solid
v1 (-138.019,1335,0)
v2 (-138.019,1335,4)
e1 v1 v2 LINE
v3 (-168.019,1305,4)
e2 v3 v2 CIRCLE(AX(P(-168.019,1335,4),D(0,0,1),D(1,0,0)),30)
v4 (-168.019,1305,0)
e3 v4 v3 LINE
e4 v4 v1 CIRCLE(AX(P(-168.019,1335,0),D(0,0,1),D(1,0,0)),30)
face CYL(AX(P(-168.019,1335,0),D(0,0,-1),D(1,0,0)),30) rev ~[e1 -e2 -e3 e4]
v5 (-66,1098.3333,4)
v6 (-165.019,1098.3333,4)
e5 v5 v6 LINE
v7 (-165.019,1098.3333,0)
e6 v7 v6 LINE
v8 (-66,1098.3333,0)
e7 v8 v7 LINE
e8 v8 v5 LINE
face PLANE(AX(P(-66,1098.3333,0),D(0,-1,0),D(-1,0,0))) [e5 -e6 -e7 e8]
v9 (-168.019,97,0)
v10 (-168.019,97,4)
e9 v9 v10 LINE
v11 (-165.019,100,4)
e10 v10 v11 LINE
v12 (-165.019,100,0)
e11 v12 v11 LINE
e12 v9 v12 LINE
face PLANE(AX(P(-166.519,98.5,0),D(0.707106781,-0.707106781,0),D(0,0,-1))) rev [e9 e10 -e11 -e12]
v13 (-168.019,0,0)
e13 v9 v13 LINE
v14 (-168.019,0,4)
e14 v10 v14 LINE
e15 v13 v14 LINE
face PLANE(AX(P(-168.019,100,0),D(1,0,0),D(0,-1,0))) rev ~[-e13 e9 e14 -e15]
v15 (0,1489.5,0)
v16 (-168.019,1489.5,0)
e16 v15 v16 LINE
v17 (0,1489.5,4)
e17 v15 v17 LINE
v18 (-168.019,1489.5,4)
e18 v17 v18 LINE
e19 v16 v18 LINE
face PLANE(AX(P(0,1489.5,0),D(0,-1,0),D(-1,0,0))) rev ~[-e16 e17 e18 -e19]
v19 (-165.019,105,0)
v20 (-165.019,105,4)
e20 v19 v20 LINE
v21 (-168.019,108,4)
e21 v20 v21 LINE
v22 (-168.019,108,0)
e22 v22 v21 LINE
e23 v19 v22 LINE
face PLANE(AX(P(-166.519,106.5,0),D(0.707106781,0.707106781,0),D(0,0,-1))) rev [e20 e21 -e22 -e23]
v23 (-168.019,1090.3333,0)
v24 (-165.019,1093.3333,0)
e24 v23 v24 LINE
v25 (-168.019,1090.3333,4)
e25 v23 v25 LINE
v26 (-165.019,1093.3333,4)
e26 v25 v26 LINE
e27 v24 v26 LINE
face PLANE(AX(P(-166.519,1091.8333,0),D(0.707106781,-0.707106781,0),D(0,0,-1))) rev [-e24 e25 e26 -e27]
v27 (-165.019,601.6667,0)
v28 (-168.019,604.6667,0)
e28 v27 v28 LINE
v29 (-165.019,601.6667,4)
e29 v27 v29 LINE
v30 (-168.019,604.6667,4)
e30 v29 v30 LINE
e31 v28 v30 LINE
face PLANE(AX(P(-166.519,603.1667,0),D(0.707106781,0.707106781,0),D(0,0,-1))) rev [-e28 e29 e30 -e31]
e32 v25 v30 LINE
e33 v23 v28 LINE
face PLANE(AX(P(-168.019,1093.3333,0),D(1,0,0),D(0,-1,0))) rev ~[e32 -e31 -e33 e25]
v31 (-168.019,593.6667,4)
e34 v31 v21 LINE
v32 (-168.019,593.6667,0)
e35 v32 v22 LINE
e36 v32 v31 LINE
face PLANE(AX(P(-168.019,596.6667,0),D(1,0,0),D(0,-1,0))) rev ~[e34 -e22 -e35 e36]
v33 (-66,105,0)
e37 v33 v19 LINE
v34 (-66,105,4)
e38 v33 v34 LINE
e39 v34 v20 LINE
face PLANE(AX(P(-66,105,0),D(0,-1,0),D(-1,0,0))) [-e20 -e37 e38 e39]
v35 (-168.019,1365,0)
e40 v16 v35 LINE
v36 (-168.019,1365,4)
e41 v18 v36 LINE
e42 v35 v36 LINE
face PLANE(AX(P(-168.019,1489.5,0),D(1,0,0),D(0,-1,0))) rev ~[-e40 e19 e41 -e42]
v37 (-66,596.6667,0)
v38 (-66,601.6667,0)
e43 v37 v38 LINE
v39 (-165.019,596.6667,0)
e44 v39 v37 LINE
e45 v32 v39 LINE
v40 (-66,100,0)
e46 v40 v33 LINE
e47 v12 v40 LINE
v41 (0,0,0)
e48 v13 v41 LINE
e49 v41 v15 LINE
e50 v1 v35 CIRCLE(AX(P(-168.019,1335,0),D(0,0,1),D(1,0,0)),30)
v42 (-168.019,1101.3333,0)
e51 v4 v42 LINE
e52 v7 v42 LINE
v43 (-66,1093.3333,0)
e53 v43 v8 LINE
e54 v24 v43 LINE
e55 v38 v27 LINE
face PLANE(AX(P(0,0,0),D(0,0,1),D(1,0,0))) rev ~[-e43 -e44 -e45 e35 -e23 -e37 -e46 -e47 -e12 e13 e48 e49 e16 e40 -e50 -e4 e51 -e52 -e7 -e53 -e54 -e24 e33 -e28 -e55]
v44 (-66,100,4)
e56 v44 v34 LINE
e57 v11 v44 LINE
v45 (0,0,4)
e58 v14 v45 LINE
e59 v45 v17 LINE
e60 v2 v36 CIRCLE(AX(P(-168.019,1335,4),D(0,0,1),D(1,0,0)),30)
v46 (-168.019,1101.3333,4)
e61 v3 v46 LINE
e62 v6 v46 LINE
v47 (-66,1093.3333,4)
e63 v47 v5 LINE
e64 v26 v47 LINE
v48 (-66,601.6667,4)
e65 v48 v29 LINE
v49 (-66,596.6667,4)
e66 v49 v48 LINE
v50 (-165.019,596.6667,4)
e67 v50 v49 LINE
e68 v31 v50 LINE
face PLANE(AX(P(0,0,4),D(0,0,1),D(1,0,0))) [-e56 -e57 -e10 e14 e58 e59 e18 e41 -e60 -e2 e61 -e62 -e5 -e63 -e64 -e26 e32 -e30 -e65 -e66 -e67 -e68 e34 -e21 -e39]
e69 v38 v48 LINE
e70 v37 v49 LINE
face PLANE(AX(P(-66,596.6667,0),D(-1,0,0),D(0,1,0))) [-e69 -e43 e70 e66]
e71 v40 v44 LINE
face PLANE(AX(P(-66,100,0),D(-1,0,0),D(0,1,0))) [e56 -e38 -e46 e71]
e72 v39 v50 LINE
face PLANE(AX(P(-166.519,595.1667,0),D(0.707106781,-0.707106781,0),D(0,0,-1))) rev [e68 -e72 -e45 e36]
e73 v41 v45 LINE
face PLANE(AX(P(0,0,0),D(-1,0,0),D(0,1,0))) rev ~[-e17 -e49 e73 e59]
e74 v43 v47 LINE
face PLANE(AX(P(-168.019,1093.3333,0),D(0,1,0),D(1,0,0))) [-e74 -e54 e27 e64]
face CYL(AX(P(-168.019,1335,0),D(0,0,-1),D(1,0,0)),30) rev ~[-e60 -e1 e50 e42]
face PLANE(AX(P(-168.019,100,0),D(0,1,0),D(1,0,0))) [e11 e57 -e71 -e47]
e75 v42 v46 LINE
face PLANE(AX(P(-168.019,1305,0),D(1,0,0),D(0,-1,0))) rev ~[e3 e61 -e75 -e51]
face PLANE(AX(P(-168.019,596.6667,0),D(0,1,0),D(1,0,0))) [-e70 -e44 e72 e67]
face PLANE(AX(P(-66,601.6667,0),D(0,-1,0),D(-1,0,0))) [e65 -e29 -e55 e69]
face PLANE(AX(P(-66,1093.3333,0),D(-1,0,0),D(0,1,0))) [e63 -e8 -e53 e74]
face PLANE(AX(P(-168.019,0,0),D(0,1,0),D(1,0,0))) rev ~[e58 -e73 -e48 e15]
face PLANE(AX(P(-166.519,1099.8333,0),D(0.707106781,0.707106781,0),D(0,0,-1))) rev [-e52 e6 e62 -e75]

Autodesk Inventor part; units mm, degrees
ref_plane "YZ Plane" through (0, 0, 0) normal (1, 0, 0) x (0, 1, 0)
ref_plane "XZ Plane" through (0, 0, 0) normal (0, 1, 0) x (-1, 0, 0)
ref_plane "XY Plane" through (0, 0, 0) normal (0, 0, 1) x (1, 0, 0)
sketch "Sketch1" plane through (0, 0, 0) normal (0, 0, 1) x (1, 0, 0)
  line L0 (0, 1489.5) -> (-168.019, 1489.5)
  line L1 (-168.019, 1489.5) -> (-168.019, 0)
  line L2 (-168.019, 0) -> (0, 0)
  line L3 (0, 0) -> (0, 1489.5)
  line L4 (-168.019, 100) -> (-66, 100)
  line L5 (-66, 100) -> (-66, 105)
  line L6 (-66, 105) -> (-168.019, 105)
  line L7 (-168.019, 105) -> (-168.019, 100)
  line L8 (-168.019, 596.6667) -> (-66, 596.6667)
  line L9 (-66, 596.6667) -> (-66, 601.6667)
  line L10 (-66, 601.6667) -> (-168.019, 601.6667)
  line L11 (-168.019, 601.6667) -> (-168.019, 596.6667)
  line L12 (-168.019, 1093.3333) -> (-66, 1093.3333)
  line L13 (-66, 1093.3333) -> (-66, 1098.3333)
  line L14 (-66, 1098.3333) -> (-168.019, 1098.3333)
  line L15 (-168.019, 1098.3333) -> (-168.019, 1093.3333)
  circle A0 centre (-168.019, 1335) radius 30
  point P0 (-168.019, 1098.3333)
  point P1 (-168.019, 1093.3333)
  point P2 (-168.019, 596.6667)
  point P3 (-168.019, 1365)
  point P4 (-168.019, 1305)
  dimension "d0" = 1489.5
  dimension "d1" = 168.019
  dimension "d2" = 5
  dimension "d4" = 100
  dimension "d7" = 496.6667
  dimension "d23" = 66
  dimension "d29" = 60
  dimension "d30" = 1335
extrude "Plate1" add sketch "Sketch1" along normal blind 4 contours L3 L2 L1 L4 L5 L6 L8 L9 L10 L12 L13 L14 A0 L0
chamfer "Corner Chamfer1" distance 3 angle 45 6 edges at (-168.019, 100, 2) (-168.019, 105, 2) (-168.019, 596.6667, 2) (-168.019, 601.6667, 2) (-168.019, 1098.3333, 2) (-168.019, 1093.3333, 2)
equation "\"d0\" = Стрингер_длина"
equation "\"d1\" = стрингер_глубина_3"
equation "\"d2\" = паз_под_стрингер_толщина"
equation "\"d7\" = Шаг_шпангоутов"
equation "\"d23\" = паз_под_стрингер_глубина - Thickness"
equation "\"d29\" = 2 * радиус_выреза_под_сварку"
equation "\"d12\" = Thickness"
equation "\"BendRadius\" = Thickness"
equation "\"BendReliefWidth\" = Thickness"
equation "\"BendReliefDepth\" = 0.5 * Thickness"
equation "\"CornerReliefSize\" = 4 * Thickness"
equation "\"MinimumRemnant\" = 2 * Thickness"
equation "\"TransitionRadius\" = BendRadius"
equation "\"JacobiRadiusSize\" = BendRadius"
equation "\"GapSize\" = Thickness"
equation "\"Стрингер_длина\" = 1489.5"
equation "\"стрингер_глубина_3\" = 168.018988"
equation "\"паз_под_стрингер_толщина\" = 5"
equation "\"Шаг_шпангоутов\" = 496.666667"
equation "\"паз_под_стрингер_глубина\" = 70"
equation "\"Thickness\" = 4"
equation "\"радиус_выреза_под_сварку\" = 30"
properties part number "GBK 3115 stringer 3" material "Steel"
